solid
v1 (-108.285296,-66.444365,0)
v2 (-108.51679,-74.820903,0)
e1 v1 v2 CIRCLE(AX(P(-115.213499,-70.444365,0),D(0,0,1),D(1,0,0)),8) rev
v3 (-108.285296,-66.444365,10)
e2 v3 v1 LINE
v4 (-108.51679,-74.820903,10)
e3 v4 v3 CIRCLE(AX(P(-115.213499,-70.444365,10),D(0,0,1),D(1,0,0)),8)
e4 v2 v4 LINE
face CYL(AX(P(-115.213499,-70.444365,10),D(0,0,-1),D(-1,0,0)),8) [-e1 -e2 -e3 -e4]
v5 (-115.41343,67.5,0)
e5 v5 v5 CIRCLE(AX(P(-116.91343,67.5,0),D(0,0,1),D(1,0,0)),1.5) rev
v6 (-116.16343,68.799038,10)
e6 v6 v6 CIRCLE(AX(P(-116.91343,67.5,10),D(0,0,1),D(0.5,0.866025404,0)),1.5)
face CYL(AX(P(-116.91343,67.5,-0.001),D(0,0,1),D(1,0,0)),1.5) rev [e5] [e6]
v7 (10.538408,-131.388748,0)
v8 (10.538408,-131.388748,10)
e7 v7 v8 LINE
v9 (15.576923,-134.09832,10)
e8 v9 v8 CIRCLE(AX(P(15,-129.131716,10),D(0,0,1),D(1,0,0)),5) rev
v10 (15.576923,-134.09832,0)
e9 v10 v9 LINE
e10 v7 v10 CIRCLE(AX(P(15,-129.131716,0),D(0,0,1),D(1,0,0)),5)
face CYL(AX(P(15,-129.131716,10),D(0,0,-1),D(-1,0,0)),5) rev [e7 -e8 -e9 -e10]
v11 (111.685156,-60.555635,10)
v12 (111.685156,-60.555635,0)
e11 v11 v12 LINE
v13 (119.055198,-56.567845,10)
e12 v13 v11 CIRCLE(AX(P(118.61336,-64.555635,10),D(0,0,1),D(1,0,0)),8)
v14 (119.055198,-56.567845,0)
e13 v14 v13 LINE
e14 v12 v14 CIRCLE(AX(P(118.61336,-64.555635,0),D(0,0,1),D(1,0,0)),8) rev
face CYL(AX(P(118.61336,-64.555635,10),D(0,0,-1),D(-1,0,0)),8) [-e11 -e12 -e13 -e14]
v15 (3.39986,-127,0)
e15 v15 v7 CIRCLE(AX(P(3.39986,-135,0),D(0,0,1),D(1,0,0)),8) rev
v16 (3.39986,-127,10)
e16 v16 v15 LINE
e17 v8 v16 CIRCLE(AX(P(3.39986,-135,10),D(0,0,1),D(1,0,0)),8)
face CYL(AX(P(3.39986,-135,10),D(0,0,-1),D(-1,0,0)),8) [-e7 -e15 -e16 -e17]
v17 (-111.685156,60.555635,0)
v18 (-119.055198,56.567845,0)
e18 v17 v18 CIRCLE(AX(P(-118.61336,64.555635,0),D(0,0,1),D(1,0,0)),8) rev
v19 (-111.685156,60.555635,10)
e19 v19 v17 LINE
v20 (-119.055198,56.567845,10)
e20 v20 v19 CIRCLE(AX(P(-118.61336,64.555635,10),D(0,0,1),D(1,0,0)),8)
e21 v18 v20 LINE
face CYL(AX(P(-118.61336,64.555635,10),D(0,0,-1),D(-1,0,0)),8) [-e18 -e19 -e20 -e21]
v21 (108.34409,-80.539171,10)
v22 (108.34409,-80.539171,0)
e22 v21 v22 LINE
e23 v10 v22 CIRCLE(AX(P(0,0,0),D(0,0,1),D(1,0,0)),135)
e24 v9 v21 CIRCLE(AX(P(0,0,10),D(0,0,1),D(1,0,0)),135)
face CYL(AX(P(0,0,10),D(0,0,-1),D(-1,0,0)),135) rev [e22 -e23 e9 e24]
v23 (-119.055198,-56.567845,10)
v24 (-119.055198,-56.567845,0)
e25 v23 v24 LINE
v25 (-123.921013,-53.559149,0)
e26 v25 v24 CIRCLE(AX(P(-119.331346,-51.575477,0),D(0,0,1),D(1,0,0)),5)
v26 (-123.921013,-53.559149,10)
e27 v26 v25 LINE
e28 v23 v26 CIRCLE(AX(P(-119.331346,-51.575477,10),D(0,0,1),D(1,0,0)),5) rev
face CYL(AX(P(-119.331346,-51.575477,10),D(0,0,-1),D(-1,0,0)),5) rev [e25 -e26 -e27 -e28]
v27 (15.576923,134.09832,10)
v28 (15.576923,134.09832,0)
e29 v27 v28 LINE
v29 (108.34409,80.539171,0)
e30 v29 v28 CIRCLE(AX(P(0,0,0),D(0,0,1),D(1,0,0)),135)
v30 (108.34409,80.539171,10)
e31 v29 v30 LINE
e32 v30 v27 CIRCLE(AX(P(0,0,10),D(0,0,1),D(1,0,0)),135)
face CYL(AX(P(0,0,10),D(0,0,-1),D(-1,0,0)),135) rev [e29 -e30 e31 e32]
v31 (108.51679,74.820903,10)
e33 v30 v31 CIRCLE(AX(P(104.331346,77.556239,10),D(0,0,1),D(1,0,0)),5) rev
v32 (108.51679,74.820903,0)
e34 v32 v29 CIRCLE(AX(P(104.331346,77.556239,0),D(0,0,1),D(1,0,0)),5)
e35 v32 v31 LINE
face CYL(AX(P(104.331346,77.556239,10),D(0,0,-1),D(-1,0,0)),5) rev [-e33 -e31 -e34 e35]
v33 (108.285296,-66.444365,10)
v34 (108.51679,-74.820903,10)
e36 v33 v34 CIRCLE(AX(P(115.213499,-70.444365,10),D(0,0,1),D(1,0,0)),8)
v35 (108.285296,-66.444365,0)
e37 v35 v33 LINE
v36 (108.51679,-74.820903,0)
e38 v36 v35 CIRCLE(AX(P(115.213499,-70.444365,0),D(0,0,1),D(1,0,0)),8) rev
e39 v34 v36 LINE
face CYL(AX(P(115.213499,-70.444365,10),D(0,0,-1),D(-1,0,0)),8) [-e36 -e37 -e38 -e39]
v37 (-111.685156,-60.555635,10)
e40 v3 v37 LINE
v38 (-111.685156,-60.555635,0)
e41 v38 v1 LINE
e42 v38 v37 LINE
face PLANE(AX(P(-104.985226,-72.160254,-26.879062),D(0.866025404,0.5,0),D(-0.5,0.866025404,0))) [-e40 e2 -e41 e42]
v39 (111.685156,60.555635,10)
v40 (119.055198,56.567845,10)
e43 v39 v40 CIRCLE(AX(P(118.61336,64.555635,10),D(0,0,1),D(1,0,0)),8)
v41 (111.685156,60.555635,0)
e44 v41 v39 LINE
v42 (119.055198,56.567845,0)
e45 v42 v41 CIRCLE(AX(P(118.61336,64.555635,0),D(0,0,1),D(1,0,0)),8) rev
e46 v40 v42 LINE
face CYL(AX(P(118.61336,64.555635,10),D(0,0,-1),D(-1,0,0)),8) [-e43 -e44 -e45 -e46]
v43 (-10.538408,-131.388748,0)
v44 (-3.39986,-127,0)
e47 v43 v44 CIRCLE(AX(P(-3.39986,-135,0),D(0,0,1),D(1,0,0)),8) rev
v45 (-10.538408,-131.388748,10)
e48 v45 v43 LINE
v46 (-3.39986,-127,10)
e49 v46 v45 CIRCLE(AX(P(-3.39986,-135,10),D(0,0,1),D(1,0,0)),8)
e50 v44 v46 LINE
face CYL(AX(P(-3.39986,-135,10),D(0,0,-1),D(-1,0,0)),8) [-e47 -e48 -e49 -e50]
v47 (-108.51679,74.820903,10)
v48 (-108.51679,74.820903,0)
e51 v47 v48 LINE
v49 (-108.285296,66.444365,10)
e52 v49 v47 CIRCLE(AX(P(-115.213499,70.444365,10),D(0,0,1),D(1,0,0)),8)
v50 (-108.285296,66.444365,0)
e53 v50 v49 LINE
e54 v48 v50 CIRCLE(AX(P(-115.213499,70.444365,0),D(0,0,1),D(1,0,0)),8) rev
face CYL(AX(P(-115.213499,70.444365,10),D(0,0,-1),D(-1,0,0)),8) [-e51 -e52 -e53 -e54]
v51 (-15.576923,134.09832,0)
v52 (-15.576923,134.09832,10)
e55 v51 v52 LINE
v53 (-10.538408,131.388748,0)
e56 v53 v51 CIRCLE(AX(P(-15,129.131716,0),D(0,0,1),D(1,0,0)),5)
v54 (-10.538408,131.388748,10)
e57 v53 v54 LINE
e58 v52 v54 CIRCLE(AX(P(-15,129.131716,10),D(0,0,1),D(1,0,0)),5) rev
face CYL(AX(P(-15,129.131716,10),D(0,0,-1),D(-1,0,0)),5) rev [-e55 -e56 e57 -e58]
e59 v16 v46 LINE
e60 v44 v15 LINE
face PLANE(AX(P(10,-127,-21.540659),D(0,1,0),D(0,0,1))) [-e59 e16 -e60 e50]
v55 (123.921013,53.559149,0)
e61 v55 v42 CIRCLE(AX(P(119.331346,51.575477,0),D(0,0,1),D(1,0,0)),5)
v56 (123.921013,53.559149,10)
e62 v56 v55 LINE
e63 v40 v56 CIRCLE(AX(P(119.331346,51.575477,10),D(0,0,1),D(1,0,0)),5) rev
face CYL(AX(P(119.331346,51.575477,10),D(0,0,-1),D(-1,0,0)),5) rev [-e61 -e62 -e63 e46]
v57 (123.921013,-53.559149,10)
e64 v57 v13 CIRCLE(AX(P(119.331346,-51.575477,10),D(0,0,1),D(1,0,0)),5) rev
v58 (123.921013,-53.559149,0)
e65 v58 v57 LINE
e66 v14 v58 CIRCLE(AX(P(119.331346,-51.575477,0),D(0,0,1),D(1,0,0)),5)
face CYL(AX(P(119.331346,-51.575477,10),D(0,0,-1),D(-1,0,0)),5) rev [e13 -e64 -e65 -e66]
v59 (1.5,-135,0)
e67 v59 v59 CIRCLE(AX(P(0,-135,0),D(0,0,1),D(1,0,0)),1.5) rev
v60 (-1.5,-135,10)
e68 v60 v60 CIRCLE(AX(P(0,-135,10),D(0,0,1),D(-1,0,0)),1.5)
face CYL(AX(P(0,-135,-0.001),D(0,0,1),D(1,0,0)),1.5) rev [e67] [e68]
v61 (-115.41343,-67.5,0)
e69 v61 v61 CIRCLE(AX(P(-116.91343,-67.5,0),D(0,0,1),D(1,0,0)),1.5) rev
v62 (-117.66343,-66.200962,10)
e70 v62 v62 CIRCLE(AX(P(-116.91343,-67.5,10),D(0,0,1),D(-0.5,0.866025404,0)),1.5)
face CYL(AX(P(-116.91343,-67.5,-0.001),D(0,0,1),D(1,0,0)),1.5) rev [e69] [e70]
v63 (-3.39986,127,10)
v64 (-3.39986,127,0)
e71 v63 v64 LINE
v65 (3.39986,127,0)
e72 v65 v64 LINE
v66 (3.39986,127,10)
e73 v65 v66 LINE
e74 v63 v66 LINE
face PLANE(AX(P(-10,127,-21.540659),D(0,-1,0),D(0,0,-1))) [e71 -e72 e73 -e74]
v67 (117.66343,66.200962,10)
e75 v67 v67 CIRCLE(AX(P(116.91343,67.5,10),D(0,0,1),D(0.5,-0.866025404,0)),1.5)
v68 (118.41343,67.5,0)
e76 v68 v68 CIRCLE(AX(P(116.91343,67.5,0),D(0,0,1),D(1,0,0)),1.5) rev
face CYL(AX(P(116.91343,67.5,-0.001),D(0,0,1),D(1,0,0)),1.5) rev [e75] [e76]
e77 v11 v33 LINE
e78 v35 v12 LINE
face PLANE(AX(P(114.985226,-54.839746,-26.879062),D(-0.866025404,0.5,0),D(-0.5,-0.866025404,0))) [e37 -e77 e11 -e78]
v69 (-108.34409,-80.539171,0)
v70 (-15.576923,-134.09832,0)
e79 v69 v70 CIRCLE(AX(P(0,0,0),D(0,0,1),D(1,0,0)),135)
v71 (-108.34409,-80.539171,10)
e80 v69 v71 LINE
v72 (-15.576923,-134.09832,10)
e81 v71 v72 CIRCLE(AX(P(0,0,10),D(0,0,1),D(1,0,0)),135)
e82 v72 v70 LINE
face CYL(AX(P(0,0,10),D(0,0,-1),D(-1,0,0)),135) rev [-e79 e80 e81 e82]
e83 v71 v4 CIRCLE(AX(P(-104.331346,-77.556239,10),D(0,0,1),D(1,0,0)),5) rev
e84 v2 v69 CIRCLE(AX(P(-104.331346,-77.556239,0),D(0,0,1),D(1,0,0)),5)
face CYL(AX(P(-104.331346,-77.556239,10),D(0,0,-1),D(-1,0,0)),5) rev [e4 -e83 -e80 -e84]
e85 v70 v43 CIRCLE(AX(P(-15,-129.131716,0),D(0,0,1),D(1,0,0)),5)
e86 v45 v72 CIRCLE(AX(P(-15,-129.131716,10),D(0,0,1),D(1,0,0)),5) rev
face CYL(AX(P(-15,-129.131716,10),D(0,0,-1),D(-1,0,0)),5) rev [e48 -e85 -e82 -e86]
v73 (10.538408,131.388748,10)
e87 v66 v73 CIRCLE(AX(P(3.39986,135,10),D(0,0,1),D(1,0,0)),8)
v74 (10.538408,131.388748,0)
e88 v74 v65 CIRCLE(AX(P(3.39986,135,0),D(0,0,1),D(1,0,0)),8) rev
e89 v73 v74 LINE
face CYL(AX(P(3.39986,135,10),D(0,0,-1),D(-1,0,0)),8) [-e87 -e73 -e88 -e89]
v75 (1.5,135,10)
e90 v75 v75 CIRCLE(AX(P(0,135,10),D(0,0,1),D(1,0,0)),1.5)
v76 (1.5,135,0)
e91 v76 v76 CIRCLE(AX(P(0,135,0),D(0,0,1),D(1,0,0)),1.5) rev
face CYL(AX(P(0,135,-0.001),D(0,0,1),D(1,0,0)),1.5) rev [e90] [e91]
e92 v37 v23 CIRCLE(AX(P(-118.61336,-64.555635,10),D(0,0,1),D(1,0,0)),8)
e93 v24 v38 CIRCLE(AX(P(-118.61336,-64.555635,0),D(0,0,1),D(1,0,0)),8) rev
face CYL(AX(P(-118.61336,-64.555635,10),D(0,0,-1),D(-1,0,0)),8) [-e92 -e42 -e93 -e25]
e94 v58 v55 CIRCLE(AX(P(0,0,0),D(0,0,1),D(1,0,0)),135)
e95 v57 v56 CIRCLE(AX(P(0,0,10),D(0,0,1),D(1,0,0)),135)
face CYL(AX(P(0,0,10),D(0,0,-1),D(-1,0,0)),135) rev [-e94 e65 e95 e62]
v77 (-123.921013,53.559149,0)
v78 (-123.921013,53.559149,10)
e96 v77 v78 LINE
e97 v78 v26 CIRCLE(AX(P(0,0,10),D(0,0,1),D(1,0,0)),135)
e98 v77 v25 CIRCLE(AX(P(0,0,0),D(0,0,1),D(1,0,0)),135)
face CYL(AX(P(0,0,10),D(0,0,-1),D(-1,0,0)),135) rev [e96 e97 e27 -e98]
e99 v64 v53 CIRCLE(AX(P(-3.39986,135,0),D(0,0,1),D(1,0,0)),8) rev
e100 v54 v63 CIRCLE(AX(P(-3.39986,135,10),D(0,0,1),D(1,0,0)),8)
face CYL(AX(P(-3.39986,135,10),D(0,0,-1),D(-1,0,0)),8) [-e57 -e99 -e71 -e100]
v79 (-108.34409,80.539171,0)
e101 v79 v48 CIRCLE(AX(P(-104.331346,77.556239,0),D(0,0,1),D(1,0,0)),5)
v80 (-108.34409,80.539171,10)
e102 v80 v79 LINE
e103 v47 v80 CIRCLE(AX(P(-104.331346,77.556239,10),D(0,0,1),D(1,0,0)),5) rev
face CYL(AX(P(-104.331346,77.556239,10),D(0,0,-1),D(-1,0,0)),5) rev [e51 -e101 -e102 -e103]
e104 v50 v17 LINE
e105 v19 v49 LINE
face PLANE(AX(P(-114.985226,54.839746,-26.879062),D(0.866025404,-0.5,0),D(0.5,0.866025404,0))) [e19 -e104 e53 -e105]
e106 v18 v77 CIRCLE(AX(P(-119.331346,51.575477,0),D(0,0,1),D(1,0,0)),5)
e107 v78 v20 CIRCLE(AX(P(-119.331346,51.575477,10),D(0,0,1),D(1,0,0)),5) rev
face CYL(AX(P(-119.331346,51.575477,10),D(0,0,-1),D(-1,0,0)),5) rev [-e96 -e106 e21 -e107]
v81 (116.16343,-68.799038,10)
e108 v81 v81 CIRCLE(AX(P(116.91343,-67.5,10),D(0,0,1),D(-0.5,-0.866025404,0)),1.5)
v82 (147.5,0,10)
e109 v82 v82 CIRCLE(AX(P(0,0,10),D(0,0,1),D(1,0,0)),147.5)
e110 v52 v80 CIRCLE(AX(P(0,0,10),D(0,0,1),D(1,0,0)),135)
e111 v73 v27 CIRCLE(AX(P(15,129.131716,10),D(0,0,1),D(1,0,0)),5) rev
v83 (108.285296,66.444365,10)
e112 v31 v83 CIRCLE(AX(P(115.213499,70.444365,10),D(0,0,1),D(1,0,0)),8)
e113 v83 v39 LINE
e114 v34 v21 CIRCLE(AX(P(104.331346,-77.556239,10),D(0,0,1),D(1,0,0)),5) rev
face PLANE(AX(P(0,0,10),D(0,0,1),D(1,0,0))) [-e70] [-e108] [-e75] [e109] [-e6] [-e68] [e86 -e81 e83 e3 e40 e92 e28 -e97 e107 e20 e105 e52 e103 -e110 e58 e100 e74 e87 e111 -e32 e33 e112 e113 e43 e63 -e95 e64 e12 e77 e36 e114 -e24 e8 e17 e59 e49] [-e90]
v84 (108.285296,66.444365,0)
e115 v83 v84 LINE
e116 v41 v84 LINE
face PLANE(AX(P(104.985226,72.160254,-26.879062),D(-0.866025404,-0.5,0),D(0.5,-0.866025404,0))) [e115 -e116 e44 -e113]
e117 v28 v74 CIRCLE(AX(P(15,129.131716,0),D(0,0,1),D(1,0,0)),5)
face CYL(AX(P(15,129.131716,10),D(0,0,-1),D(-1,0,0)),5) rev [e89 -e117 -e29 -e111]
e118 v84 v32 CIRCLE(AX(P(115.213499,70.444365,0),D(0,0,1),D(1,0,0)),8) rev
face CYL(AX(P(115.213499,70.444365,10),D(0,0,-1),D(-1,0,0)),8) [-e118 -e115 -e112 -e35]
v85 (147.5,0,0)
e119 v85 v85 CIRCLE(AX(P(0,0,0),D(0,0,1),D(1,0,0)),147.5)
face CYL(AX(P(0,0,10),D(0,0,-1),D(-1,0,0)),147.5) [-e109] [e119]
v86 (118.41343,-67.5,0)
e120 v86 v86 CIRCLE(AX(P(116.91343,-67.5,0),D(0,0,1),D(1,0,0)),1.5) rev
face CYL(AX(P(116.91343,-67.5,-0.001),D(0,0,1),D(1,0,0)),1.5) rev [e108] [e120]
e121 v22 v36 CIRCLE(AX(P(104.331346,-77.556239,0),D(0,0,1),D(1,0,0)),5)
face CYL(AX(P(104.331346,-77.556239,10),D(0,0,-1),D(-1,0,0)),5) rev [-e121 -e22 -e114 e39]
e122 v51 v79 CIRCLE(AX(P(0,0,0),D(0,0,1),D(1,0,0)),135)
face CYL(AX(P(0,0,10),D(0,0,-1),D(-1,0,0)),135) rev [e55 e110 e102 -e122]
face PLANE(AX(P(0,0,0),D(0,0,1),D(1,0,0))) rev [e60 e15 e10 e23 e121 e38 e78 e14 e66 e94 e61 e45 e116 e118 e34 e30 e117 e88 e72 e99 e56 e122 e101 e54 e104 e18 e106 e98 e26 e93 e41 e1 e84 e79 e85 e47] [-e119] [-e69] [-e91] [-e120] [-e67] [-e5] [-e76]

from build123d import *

# Parameters (mm, degrees)
SKETCH1_R           = 147.5
SKETCH1_R_2         = 135
BOSS_EXTRUDE1_DEPTH = 10
BOSS_EXTRUDE2_START = -10
BOSS_EXTRUDE2_DEPTH = 10
FILLET1_R           = 5
FILLET2_R           = 8
CUT_EXTRUDE1_REACH  = 210.836
SKETCH5_R           = 1.5
CIRPATTERN1_DEPTH   = 10
CIRPATTERN1_2_DEPTH = 10


# Read off the part's stored shape, not the designer's step: CirPattern1
with BuildPart() as part:
    # Sketch1 → Boss-Extrude1 (new body)
    with BuildSketch(Plane.XY):
        Circle(SKETCH1_R)
        Circle(SKETCH1_R_2, mode=Mode.SUBTRACT)
    extrude(amount=BOSS_EXTRUDE1_DEPTH)

    # Sketch3 → Boss-Extrude2 (add)
    with BuildSketch(Plane.XY.offset(10).offset(BOSS_EXTRUDE2_START)):
        with BuildLine():
            Line((-10, 127), (10, 127))
            Line((10, 127), (10, 134.629120178))
            ThreePointArc((10, 134.629120178), (0, 135), (-10, 134.629120178))
            Line((-10, 134.629120178), (-10, 127))
        make_face()
    extrude(amount=BOSS_EXTRUDE2_DEPTH)

    # Fillet1
    fillet1_edges = [part.edges().sort_by_distance(p)[0] for p in [
        (-10, 134.629120178, 5),
        (10, 134.629120178, 5),
    ]]
    fillet(fillet1_edges, radius=FILLET1_R)

    # Fillet2
    fillet2_edges = [part.edges().sort_by_distance(p)[0] for p in [
        (10, 127, 5),
        (-10, 127, 5),
    ]]
    fillet(fillet2_edges, radius=FILLET2_R)

    # Sketch5 → Cut-Extrude1 (cut, up to next)
    with BuildSketch(Plane.XY.offset(10), mode=Mode.PRIVATE) as cut_extrude1_sk1:
        with Locations((0, 135)):
            Circle(SKETCH5_R)
    cut_extrude1_tool1 = extrude(cut_extrude1_sk1.sketch, amount=-CUT_EXTRUDE1_REACH, mode=Mode.PRIVATE) & part.part
    add(cut_extrude1_tool1.solids().sort_by_distance((0, 135, 10))[0], mode=Mode.SUBTRACT)

    # CirPattern1 outline → CirPattern1 (cut)
    with BuildSketch(Plane.XY):
        with BuildLine():
            ThreePointArc((-116.156224207, 68.794851392), (-118.212467617, 68.25), (-117.656201059, 66.196815275))
            ThreePointArc((-117.656201059, 66.196815275), (-116.913429511, 67.5), (-116.156224207, 68.794851392))
        make_face()
        with BuildLine():
            ThreePointArc((-116.156224207, -68.794851392), (-116.913429511, -67.5), (-117.656201059, -66.196815275))
            ThreePointArc((-117.656201059, -66.196815275), (-118.212467617, -68.25), (-116.156224207, -68.794851392))
        make_face()
        with BuildLine():
            ThreePointArc((1.499976852, -134.991666667), (0, -135), (-1.499976852, -134.991666667))
            ThreePointArc((-1.499976852, -134.991666667), (0, -136.5), (1.499976852, -134.991666667))
        make_face()
        with BuildLine():
            ThreePointArc((117.656201059, -66.196815275), (116.913429511, -67.5), (116.156224207, -68.794851392))
            ThreePointArc((116.156224207, -68.794851392), (118.212467617, -68.25), (117.656201059, -66.196815275))
        make_face()
        with BuildLine():
            ThreePointArc((116.156224207, 68.794851392), (116.913429511, 67.5), (117.656201059, 66.196815275))
            ThreePointArc((117.656201059, 66.196815275), (118.212467617, 68.25), (116.156224207, 68.794851392))
        make_face()
    extrude(amount=CIRPATTERN1_DEPTH, mode=Mode.SUBTRACT)

    # CirPattern1 2 outline → CirPattern1 2 (add)
    with BuildSketch(Plane.XY):
        with BuildLine():
            ThreePointArc((-119.055197564, 56.567845161), (-114.80628077, 57.519573858), (-111.685156467, 60.555634549))
            Line((-111.685156467, 60.555634549), (-108.285296095, 66.444365451))
            ThreePointArc((-108.285296095, 66.444365451), (-107.216552561, 70.665368732), (-108.516789729, 74.820902963))
            ThreePointArc((-108.516789729, 74.820902963), (-109.329067487, 77.707176829), (-108.344090318, 80.539171173))
            ThreePointArc((-108.344090318, 80.539171173), (-112.403647927, 74.76911082), (-116.156224207, 68.794851392))
            ThreePointArc((-116.156224207, 68.794851392), (-115.614391405, 66.75), (-117.656201059, 66.196815275))
            ThreePointArc((-117.656201059, 66.196815275), (-120.953773352, 59.959859172), (-123.921013395, 53.559148978))
            ThreePointArc((-123.921013395, 53.559148978), (-121.960922934, 55.828161401), (-119.055197564, 56.567845161))
        make_face()
        with BuildLine():
            ThreePointArc((119.055197564, 56.567845161), (121.960922934, 55.828161401), (123.921013394, 53.559148978))
            ThreePointArc((123.921013394, 53.559148978), (120.953773352, 59.959859172), (117.656201059, 66.196815275))
            ThreePointArc((117.656201059, 66.196815275), (115.614391405, 66.75), (116.156224207, 68.794851392))
            ThreePointArc((116.156224207, 68.794851392), (112.403647927, 74.76911082), (108.344090318, 80.539171173))
            ThreePointArc((108.344090318, 80.539171173), (109.329067487, 77.707176829), (108.516789729, 74.820902963))
            ThreePointArc((108.516789729, 74.820902963), (107.216552561, 70.665368732), (108.285296095, 66.444365451))
            Line((108.285296095, 66.444365451), (111.685156467, 60.555634549))
            ThreePointArc((111.685156467, 60.555634549), (114.80628077, 57.519573858), (119.055197564, 56.567845161))
        make_face()
        with BuildLine():
            ThreePointArc((108.516789729, -74.820902963), (109.329067487, -77.707176829), (108.344090318, -80.539171173))
            ThreePointArc((108.344090318, -80.539171173), (112.403647927, -74.76911082), (116.156224207, -68.794851392))
            ThreePointArc((116.156224207, -68.794851392), (115.614391405, -66.75), (117.656201059, -66.196815275))
            ThreePointArc((117.656201059, -66.196815275), (120.953773352, -59.959859172), (123.921013395, -53.559148978))
            ThreePointArc((123.921013395, -53.559148978), (121.960922934, -55.828161401), (119.055197564, -56.567845161))
            ThreePointArc((119.055197564, -56.567845161), (114.80628077, -57.519573858), (111.685156467, -60.555634549))
            Line((111.685156467, -60.555634549), (108.285296095, -66.444365451))
            ThreePointArc((108.285296095, -66.444365451), (107.216552561, -70.665368732), (108.516789729, -74.820902963))
        make_face()
        with BuildLine():
            ThreePointArc((-10.538407835, -131.388748124), (-12.631855447, -133.53533823), (-15.576923077, -134.098320152))
            ThreePointArc((-15.576923077, -134.098320152), (-8.550125426, -134.728969992), (-1.499976852, -134.991666667))
            ThreePointArc((-1.499976852, -134.991666667), (0, -133.5), (1.499976852, -134.991666667))
            ThreePointArc((1.499976852, -134.991666667), (8.550125426, -134.728969992), (15.576923077, -134.098320152))
            ThreePointArc((15.576923077, -134.098320152), (12.631855447, -133.53533823), (10.538407835, -131.388748124))
            ThreePointArc((10.538407835, -131.388748124), (7.589728209, -128.18494259), (3.399860372, -127))
            Line((3.399860372, -127), (-3.399860372, -127))
            ThreePointArc((-3.399860372, -127), (-7.589728209, -128.18494259), (-10.538407835, -131.388748124))
        make_face()
        with BuildLine():
            ThreePointArc((-119.055197564, -56.567845161), (-121.960922934, -55.828161401), (-123.921013394, -53.559148978))
            ThreePointArc((-123.921013394, -53.559148978), (-120.953773352, -59.959859172), (-117.656201059, -66.196815275))
            ThreePointArc((-117.656201059, -66.196815275), (-115.614391405, -66.75), (-116.156224207, -68.794851392))
            ThreePointArc((-116.156224207, -68.794851392), (-112.403647927, -74.76911082), (-108.344090318, -80.539171173))
            ThreePointArc((-108.344090318, -80.539171173), (-109.329067487, -77.707176829), (-108.516789729, -74.820902963))
            ThreePointArc((-108.516789729, -74.820902963), (-107.216552561, -70.665368732), (-108.285296095, -66.444365451))
            Line((-108.285296095, -66.444365451), (-111.685156467, -60.555634549))
            ThreePointArc((-111.685156467, -60.555634549), (-114.80628077, -57.519573858), (-119.055197564, -56.567845161))
        make_face()
    extrude(amount=CIRPATTERN1_2_DEPTH)


solid = part.part
